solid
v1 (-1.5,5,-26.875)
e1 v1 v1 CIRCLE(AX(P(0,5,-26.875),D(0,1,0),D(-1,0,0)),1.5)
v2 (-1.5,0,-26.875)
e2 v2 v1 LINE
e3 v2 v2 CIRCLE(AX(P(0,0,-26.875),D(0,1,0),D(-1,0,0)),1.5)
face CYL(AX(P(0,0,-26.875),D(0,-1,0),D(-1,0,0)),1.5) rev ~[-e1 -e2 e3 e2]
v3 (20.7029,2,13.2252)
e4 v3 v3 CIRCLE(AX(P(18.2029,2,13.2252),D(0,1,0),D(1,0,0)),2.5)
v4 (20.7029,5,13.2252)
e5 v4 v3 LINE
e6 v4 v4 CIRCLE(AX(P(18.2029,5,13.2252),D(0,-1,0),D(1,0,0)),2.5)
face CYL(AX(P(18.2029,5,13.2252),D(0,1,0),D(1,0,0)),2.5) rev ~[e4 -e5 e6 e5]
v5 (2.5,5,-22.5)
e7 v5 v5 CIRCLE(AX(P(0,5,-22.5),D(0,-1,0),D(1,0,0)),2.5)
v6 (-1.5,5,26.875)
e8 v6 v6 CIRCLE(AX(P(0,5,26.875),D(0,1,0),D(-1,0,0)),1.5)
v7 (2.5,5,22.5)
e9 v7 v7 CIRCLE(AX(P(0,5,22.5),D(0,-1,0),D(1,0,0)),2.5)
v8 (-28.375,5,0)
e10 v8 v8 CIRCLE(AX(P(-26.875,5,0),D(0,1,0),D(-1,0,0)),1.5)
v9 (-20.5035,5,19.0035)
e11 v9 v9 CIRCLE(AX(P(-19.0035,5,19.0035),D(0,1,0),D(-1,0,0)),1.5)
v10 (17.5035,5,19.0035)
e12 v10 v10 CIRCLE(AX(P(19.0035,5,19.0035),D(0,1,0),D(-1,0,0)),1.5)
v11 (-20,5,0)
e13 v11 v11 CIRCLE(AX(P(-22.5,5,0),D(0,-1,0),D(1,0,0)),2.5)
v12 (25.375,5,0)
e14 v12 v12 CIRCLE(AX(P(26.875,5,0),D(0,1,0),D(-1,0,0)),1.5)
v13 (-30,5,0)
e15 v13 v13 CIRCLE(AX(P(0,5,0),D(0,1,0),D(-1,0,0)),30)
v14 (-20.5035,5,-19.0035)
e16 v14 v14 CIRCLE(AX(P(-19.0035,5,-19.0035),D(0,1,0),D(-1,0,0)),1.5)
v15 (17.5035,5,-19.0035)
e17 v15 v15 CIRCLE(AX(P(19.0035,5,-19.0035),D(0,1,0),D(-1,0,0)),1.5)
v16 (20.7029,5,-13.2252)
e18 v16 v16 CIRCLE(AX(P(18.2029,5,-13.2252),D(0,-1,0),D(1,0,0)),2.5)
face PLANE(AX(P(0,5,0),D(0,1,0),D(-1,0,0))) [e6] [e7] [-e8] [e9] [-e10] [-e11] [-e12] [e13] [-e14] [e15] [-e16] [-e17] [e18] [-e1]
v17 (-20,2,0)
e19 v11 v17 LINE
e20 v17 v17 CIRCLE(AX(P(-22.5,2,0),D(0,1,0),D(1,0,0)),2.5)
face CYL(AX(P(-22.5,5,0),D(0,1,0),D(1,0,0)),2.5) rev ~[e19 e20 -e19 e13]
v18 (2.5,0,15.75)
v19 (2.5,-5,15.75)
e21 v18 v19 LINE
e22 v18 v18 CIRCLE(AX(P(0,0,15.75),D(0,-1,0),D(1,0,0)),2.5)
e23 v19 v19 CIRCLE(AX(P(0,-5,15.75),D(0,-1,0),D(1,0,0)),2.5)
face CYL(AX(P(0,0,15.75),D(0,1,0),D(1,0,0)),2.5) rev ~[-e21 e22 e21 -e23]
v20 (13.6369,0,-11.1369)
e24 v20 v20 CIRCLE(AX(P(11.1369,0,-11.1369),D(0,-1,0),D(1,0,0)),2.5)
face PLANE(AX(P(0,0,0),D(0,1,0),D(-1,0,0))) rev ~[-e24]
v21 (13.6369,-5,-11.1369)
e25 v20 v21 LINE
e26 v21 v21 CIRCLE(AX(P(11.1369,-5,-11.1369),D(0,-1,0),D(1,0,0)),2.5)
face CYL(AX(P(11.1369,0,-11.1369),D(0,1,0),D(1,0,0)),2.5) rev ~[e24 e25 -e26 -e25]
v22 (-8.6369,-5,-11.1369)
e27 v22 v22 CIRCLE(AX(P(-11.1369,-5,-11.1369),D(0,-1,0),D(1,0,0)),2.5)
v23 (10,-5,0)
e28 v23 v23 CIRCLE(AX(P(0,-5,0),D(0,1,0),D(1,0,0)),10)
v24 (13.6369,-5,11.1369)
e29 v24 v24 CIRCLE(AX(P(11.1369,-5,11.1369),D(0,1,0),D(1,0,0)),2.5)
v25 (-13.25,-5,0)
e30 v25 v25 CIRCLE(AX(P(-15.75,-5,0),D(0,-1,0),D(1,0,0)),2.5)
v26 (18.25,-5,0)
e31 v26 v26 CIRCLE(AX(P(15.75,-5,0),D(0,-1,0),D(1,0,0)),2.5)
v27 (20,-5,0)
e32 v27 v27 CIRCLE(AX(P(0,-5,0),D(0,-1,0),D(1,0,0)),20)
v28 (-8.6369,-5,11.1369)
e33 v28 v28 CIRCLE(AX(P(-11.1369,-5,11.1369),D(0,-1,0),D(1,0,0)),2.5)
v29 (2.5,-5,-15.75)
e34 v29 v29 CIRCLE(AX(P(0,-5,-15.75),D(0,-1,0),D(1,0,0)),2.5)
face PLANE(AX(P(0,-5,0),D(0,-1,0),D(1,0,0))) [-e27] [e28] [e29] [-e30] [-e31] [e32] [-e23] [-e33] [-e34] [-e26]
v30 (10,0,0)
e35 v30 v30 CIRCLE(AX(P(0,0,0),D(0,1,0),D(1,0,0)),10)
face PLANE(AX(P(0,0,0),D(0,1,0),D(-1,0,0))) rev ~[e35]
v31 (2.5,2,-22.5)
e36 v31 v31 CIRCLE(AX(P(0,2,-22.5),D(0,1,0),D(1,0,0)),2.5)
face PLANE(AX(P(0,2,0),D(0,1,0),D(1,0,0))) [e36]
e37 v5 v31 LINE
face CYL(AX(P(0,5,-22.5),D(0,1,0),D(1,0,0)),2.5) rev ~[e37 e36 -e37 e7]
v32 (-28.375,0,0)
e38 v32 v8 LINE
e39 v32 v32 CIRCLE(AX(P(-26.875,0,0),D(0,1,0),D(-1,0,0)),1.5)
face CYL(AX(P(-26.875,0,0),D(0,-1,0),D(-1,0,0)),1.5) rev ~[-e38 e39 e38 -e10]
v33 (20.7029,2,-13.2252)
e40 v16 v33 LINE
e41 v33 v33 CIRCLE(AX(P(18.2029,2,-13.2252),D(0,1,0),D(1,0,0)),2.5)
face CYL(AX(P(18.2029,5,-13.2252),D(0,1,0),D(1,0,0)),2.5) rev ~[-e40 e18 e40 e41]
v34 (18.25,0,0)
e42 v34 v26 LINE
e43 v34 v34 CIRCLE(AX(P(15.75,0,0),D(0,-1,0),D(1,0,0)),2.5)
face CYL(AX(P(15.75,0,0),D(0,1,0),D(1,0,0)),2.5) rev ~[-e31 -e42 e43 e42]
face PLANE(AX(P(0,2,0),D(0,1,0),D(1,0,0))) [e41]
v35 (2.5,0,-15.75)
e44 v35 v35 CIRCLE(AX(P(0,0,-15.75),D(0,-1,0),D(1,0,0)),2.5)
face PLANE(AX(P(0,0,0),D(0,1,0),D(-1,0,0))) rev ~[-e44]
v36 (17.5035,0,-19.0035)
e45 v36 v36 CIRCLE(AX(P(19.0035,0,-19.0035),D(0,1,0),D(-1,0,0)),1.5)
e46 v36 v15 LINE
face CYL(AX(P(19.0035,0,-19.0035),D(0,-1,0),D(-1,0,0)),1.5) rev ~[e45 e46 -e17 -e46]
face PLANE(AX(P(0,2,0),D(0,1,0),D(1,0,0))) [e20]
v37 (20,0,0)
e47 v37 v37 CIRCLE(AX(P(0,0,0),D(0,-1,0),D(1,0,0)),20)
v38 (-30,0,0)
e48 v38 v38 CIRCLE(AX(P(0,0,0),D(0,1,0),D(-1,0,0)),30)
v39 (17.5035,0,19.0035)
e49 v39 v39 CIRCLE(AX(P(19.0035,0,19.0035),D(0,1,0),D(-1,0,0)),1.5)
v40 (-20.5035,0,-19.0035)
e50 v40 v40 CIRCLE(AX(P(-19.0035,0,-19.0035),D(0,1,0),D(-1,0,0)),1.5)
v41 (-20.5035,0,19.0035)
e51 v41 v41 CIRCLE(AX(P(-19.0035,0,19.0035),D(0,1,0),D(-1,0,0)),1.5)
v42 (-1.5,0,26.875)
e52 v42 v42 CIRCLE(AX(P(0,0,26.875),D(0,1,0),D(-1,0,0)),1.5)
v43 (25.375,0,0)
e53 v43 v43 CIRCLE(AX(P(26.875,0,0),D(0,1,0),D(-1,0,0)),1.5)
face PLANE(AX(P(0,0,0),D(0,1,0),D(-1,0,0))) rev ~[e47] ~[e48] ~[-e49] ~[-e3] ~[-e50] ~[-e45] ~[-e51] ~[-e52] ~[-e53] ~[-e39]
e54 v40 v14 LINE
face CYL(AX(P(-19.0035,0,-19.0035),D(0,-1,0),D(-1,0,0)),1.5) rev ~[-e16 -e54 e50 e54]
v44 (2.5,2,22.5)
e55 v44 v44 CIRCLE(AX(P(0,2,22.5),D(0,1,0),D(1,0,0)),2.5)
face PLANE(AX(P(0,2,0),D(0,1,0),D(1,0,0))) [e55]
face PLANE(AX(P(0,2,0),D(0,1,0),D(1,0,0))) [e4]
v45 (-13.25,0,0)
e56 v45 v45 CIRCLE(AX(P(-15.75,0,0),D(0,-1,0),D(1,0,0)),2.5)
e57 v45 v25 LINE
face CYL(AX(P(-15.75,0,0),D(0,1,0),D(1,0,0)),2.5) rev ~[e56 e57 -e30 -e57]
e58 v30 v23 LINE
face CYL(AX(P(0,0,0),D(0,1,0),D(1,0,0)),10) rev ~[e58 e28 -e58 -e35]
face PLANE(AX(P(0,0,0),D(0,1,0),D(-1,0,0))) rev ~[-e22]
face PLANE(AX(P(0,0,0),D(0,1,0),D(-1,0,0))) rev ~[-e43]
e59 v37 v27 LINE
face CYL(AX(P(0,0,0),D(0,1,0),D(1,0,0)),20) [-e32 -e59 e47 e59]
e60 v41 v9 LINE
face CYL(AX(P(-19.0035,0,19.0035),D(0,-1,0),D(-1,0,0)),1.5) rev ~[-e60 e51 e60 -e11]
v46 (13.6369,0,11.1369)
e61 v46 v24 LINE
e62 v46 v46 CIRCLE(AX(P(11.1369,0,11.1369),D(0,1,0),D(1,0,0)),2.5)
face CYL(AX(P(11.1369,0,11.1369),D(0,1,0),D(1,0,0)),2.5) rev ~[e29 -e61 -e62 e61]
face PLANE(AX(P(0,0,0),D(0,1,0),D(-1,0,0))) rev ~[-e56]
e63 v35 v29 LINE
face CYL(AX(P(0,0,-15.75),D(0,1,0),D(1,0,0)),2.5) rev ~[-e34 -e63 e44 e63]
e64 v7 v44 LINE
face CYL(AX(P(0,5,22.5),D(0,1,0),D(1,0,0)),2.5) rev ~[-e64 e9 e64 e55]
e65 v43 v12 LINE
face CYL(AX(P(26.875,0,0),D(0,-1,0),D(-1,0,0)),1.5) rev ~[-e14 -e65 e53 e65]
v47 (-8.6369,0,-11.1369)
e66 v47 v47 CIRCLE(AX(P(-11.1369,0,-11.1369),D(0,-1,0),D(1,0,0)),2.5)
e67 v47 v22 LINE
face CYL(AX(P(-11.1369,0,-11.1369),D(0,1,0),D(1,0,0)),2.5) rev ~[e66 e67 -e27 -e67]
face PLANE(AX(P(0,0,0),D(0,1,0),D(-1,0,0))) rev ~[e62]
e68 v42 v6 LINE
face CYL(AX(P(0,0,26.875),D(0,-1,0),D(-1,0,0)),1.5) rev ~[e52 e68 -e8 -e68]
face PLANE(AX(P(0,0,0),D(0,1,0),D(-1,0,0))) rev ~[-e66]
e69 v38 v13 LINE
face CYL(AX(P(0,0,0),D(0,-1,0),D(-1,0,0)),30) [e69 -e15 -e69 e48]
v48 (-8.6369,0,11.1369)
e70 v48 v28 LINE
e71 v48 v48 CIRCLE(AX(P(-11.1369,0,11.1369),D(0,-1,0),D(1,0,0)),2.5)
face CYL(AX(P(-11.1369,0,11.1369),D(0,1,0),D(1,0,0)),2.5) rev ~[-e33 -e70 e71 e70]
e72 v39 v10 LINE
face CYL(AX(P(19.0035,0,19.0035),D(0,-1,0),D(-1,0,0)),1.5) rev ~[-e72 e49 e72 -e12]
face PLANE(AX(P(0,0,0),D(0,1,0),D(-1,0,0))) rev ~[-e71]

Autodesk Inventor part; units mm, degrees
ref_plane "YZ Plane" through (0, 0, 0) normal (1, 0, 0) x (0, 1, 0)
ref_plane "XZ Plane" through (0, 0, 0) normal (0, 1, 0) x (-1, 0, 0)
ref_plane "XY Plane" through (0, 0, 0) normal (0, 0, 1) x (1, 0, 0)
sketch "Sketch1" plane through (0, 0, 0) normal (0, 1, 0) x (-1, 0, 0)
  circle A0 centre (26.875, 0) radius 1.5
  circle A1 centre (0, -26.875) radius 1.5
  circle A2 centre (-26.875, 0) radius 1.5
  circle A3 centre (0, 26.875) radius 1.5
  circle A4 centre (19.0035, 19.0035) radius 1.5
  circle A5 centre (19.0035, -19.0035) radius 1.5
  circle A6 centre (-19.0035, -19.0035) radius 1.5
  circle A7 centre (-19.0035, 19.0035) radius 1.5
  circle A8 centre (0, 0) radius 28.75
  circle A9 centre (0, 0) radius 30
  point P0 (-23.5374, 22.0452)
  dimension "d9" = 3
  dimension "d10" = 3
  dimension "d11" = 3
  dimension "d12" = 3
  dimension "d13" = 3
  dimension "d14" = 3
  dimension "d15" = 3
  dimension "d16" = 3
  dimension "d17" = 57.5
  dimension "d33" = 60
extrude "Extrusion1" add sketch "Sketch1" along normal blind 5 contours A8 | A9
sketch "Sketch2" plane through (0, 5, 0) normal (0, 1, 0) x (1, 0, 0)
  circle A0 centre (0, 0) radius 25
  line L0 (22.1416, 4) -> (20.8701, 4)
  line L1 (22.1416, -4) -> (20.8701, -4)
  arc A1 (24.6779, 4) -> (-17.6137, 17.7414) centre (0, 0) ccw
  arc A2 (-17.6137, -17.7414) -> (24.6779, -4) centre (0, 0) ccw
  line L2 (24.6779, -4) -> (22.1416, -4)
  line L3 (24.6779, 4) -> (22.1416, 4)
  line L4 (-15.5618, -16.2506) -> (-14.5332, -15.5032)
  line L5 (-19.2354, -9.0311) -> (-15.1903, -6.0922)
  line L6 (-15.1903, -6.0922) -> (-10.4881, -12.5643)
  line L7 (-10.4881, -12.5643) -> (-14.5332, -15.5032)
  line L8 (-22.316, -11.2693) -> (-20.2641, -9.7784)
  line L9 (-17.6137, -17.7414) -> (-15.5618, -16.2506)
  line L10 (-20.2641, -9.7784) -> (-19.2354, -9.0311)
  circle A3 centre (0, 22.5) radius 1.5
  line L11 (-10.4881, 12.5643) -> (-15.1903, 6.0922)
  line L12 (-14.5332, 15.5032) -> (-10.4881, 12.5643)
  line L13 (-15.5618, 16.2506) -> (-14.5332, 15.5032)
  line L14 (-15.1903, 6.0922) -> (-19.2354, 9.0311)
  line L15 (-20.2641, 9.7784) -> (-19.2354, 9.0311)
  line L16 (-17.6137, 17.7414) -> (-15.5618, 16.2506)
  line L17 (-23.5374, 22.0452) -> (-13.679, 22.0452) construction
  line L18 (-22.316, 11.2693) -> (-20.2641, 9.7784)
  arc A4 (-22.316, 11.2693) -> (-22.316, -11.2693) centre (0, 0) ccw
  line L19 (15.8701, -4) -> (20.8701, -4)
  circle A5 centre (18.2029, -13.2252) radius 1.5
  circle A6 centre (0, -22.5) radius 1.5
  circle A7 centre (18.2029, 13.2252) radius 1.5
  line L20 (20.8701, 4) -> (15.8701, 4)
  line L21 (15.8701, 4) -> (15.8701, -4)
  arc A8 (-13.5023, -14.7543) -> (19.5959, -4) centre (0, 0) ccw
  arc A9 (19.5959, 4) -> (-13.5023, 14.7543) centre (0, 0) ccw
  arc A10 (-18.2046, 8.2821) -> (-18.2046, -8.2821) centre (0, 0) ccw
  circle A11 centre (-22.5, 0) radius 1.5
  circle A12 centre (0, 0) radius 20
  circle A13 centre (-22.5, 0) radius 2.5
  circle A14 centre (0, -22.5) radius 2.5
  circle A15 centre (18.2029, -13.2252) radius 2.5
  circle A16 centre (18.2029, 13.2252) radius 2.5
  circle A17 centre (0, 22.5) radius 2.5
  point P0 (-28.2397, -15.5731)
  point P1 (-23.5374, -22.0452)
  dimension "d20" = 50
  dimension "d21" = 36
  dimension "d22" = 5
  dimension "d23" = 5
  dimension "d24" = 3
  dimension "d25" = 3
  dimension "d26" = 3
  dimension "d27" = 3
  dimension "d28" = 3
  dimension "d29" = 5
  dimension "d30" = 5
extrude "Extrusion2" cut sketch "Sketch2" against normal blind 3 contours A16 | A15 | A17 | A14 | A13 | A3 | A5 | A6 | A7 | A11
sketch "Sketch3" plane through (0, 0, 0) normal (0, -1, 0) x (1, 0, 0)
  circle A0 centre (0, 0) radius 20
  circle A1 centre (0, 0) radius 10
  circle A2 centre (0, 15.75) radius 2.5
  circle A3 centre (15.75, 0) radius 2.5
  line L0 (0, 0) -> (11.1369, 11.1369)
  line L1 (0, 0) -> (15.75, 0) construction
  circle A4 centre (11.1369, 11.1369) radius 2.5
  circle A5 centre (11.1369, -11.1369) radius 2.5
  circle A6 centre (-11.1369, -11.1369) radius 2.5
  circle A7 centre (-11.1369, 11.1369) radius 2.5
  circle A8 centre (-15.75, 0) radius 2.5
  circle A9 centre (0, -15.75) radius 2.5
  dimension "d34" = 40
  dimension "d35" = 20
  dimension "d37" = 5
  dimension "d38" = 5
  dimension "d39" = 45
  dimension "d40" = 5
  dimension "d41" = 5
  dimension "d42" = 5
  dimension "d43" = 5
  dimension "d44" = 5
  dimension "d45" = 5
extrude "Extrusion3" add sketch "Sketch3" along normal blind 5
properties part number "mountingPlate"
